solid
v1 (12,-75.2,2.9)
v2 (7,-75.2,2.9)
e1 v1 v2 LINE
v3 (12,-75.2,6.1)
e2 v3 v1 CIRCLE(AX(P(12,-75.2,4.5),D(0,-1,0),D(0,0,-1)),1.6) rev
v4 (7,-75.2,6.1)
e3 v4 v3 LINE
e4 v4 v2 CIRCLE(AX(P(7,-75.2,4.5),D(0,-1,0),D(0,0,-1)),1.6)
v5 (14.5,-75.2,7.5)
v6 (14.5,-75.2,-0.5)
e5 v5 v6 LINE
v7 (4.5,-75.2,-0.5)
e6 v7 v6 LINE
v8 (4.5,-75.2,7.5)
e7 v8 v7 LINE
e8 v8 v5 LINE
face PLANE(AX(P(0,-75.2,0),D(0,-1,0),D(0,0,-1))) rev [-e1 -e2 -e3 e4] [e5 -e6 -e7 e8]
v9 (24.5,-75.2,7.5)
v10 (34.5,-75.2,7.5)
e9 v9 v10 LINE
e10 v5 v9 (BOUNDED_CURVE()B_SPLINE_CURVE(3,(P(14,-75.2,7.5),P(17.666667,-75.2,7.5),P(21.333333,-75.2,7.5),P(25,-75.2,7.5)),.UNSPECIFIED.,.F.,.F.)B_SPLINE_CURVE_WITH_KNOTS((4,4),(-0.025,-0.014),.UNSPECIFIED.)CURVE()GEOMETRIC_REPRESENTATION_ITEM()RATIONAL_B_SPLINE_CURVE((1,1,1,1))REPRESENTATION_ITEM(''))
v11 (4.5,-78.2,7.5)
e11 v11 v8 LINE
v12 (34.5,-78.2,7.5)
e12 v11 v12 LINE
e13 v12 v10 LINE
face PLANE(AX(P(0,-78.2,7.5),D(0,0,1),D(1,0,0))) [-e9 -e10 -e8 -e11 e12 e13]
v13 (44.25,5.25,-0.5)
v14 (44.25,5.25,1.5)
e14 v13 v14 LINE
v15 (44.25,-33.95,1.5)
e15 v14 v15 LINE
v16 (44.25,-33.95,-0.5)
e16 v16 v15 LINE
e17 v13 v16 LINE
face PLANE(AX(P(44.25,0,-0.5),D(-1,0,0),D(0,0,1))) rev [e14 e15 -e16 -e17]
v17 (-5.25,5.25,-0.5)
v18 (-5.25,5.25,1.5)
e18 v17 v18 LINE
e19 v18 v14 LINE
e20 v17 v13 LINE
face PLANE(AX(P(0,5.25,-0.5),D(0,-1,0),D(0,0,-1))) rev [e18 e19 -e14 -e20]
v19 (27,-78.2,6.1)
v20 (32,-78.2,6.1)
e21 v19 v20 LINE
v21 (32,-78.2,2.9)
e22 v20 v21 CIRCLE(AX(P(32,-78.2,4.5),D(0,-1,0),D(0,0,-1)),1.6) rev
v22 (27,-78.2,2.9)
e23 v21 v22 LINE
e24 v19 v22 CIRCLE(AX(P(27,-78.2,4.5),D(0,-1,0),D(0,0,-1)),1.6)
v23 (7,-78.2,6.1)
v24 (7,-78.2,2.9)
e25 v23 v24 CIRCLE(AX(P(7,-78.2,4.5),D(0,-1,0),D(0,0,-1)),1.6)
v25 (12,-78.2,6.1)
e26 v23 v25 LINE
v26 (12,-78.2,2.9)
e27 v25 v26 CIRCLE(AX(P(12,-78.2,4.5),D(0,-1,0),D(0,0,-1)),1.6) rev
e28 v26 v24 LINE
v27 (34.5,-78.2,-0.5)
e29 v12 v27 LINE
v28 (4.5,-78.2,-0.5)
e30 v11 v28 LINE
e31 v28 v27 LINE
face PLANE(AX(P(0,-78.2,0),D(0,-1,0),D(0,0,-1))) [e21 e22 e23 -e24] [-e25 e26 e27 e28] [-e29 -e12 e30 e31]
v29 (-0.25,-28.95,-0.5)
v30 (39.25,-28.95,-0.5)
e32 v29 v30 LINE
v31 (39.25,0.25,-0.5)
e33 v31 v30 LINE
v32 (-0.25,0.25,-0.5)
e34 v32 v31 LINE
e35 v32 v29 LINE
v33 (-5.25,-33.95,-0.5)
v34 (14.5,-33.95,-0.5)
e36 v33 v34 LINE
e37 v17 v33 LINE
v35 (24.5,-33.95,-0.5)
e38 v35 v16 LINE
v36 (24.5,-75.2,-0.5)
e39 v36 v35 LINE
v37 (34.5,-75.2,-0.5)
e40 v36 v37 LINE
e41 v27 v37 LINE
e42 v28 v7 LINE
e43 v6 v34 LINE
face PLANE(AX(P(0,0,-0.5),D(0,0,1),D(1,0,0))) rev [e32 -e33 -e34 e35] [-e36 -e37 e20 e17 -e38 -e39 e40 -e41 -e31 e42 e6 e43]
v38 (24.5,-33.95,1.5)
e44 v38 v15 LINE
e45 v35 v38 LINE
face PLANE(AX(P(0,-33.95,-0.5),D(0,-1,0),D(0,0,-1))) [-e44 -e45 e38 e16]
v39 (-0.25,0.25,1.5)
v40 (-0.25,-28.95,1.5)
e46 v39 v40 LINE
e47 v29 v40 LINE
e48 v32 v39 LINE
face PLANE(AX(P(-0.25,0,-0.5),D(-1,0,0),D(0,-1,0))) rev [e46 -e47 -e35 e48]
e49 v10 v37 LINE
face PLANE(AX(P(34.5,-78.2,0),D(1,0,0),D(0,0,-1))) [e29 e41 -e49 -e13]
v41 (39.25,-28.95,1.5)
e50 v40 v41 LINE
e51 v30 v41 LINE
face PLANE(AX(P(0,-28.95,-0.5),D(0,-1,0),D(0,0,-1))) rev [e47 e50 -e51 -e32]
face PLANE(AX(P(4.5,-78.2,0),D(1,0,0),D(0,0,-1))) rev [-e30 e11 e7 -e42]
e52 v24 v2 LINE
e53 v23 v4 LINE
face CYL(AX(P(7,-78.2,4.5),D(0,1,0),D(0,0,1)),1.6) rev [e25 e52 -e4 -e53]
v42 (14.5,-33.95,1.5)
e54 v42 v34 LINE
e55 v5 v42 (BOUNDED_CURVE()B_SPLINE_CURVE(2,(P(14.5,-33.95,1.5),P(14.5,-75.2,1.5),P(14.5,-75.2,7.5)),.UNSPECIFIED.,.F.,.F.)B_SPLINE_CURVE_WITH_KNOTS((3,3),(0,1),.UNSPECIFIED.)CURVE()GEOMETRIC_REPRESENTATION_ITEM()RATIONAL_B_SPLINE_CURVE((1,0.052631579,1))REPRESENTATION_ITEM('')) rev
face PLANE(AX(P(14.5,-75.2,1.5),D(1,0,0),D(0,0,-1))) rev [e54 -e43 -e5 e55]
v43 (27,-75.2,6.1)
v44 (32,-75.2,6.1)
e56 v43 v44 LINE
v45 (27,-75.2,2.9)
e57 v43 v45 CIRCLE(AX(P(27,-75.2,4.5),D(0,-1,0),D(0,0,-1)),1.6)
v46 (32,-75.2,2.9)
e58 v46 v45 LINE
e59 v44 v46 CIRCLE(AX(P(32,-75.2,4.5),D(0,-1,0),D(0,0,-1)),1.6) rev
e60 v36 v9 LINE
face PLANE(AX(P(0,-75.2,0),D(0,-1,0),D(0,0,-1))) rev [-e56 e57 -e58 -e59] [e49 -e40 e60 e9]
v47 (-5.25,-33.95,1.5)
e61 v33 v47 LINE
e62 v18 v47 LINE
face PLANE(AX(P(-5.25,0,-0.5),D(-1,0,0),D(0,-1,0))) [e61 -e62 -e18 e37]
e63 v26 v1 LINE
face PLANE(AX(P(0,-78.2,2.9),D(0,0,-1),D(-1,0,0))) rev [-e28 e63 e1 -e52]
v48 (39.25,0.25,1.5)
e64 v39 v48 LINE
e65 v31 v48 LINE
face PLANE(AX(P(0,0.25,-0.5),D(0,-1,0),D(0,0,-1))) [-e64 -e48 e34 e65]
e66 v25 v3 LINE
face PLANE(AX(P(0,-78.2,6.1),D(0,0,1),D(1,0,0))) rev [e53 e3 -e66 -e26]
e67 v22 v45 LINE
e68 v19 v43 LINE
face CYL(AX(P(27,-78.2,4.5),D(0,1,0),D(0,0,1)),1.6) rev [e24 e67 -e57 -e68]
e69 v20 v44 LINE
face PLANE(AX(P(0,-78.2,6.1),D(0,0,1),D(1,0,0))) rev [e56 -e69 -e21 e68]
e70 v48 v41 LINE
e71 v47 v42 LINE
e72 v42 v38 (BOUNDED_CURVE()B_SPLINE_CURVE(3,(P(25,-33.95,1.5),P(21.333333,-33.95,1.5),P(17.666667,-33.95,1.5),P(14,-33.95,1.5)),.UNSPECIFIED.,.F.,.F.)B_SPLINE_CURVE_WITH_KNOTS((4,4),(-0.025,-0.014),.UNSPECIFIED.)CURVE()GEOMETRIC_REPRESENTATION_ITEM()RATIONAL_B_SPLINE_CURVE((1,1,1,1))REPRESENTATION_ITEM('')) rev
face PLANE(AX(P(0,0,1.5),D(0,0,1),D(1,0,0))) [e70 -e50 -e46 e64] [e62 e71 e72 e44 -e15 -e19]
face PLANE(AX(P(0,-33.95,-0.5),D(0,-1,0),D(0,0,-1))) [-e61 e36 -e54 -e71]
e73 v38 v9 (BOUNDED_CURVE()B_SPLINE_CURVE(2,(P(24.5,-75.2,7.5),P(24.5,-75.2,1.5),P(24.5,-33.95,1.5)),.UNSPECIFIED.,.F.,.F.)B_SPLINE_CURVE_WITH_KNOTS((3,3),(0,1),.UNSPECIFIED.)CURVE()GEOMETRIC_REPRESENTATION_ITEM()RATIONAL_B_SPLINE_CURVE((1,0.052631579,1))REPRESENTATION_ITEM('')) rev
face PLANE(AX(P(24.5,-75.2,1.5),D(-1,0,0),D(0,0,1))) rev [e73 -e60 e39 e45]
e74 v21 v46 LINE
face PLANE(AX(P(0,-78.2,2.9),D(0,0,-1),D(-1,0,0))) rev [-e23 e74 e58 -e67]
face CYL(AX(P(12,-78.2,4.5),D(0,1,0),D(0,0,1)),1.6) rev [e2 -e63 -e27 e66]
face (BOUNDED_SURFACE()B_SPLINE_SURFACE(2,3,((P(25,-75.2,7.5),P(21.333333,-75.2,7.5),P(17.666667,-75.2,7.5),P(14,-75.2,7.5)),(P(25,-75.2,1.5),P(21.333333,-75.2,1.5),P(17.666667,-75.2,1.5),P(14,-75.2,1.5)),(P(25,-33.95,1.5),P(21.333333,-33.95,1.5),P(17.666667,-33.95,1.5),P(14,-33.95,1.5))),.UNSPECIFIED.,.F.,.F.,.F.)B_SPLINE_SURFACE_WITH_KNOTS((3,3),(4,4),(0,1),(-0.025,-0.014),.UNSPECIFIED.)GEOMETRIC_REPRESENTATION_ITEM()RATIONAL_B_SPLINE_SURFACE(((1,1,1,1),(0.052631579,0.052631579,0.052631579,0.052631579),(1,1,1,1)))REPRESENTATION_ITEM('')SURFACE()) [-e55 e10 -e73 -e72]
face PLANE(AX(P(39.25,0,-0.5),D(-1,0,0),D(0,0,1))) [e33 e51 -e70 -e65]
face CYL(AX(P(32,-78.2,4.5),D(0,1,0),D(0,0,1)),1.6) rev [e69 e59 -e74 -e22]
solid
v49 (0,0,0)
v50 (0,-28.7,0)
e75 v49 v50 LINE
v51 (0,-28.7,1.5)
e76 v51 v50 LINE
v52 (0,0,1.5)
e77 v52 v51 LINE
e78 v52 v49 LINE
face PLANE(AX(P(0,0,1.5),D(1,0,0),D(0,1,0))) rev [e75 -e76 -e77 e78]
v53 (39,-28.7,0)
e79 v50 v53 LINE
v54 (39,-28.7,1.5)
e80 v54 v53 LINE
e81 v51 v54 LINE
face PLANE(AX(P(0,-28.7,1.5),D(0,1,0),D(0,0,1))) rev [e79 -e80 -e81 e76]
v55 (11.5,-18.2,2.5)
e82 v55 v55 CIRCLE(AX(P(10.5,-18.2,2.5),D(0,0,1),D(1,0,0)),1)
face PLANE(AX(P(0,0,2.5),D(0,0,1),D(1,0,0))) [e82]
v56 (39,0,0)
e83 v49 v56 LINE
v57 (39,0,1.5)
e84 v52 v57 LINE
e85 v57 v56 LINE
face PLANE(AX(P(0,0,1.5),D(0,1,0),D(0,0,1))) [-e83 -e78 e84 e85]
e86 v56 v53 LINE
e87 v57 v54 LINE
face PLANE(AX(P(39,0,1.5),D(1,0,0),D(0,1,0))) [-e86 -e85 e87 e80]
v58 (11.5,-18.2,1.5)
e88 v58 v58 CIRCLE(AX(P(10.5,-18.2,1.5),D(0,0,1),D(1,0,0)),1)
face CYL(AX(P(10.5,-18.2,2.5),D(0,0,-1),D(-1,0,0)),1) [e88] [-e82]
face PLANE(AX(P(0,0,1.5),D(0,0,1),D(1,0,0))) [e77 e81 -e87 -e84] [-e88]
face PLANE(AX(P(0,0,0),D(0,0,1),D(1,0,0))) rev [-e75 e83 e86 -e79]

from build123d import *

# Parameters (mm, degrees)
SKETCH1_W            = 39
SKETCH1_H            = 28.7
BOSS_EXTRUDE2_DEPTH  = 1.5
SKETCH3_R            = 1
BOSS_EXTRUDE3_DEPTH  = 1
SKETCH4_W            = 49.5
SKETCH4_H            = 39.2
SKETCH4_W_2          = 39.5
SKETCH4_H_2          = 29.2
BOSS_EXTRUDE4_DEPTH  = 2
SKETCH6_W            = 10
SKETCH6_H            = 2
BOSS_EXTRUDE5_DEPTH  = 41.25
SKETCH7_W            = 10
SKETCH7_H            = 3
SKETCH7_H_2          = 2
BOSS_EXTRUDE10_DEPTH = 3
FILLET5_START        = 14.5
FILLET5_DEPTH        = 10


with BuildPart() as part:
    # Sketch1 → Boss-Extrude2 (new body)
    with BuildSketch(Plane.XY):
        with Locations((19.5, -14.35)):
            Rectangle(SKETCH1_W, SKETCH1_H)
    extrude(amount=BOSS_EXTRUDE2_DEPTH)

    # Sketch3 → Boss-Extrude3 (add)
    with BuildSketch(Plane.XY.offset(1.5)):
        with Locations((10.5, -18.2)):
            Circle(SKETCH3_R)
    extrude(amount=BOSS_EXTRUDE3_DEPTH)


with BuildPart() as body_2:
    # Sketch4 → Boss-Extrude4 (new body)
    with BuildSketch(Plane.XY.offset(1.5)):
        with Locations((19.5, -14.35)):
            Rectangle(SKETCH4_W, SKETCH4_H)
        with Locations((19.5, -14.35)):
            Rectangle(SKETCH4_W_2, SKETCH4_H_2, mode=Mode.SUBTRACT)
    extrude(amount=-BOSS_EXTRUDE4_DEPTH)

    # Sketch6 → Boss-Extrude5 (add)
    with BuildSketch(Plane.XZ.offset(33.95)):
        with Locations((19.5, 0.5)):
            Rectangle(SKETCH6_W, SKETCH6_H)
    extrude(amount=BOSS_EXTRUDE5_DEPTH)

    # Sketch7 → Boss-Extrude10 (add)
    with BuildSketch(Plane.XZ.offset(75.2)):
        with BuildLine():
            Line((13.6, 4.5), (14.5, 4.5))
            Line((14.5, 4.5), (14.5, 7.5))
            Line((14.5, 7.5), (4.5, 7.5))
            Line((4.5, 7.5), (4.5, 4.5))
            Line((4.5, 4.5), (5.4, 4.5))
            ThreePointArc((5.4, 4.5), (5.86862915, 5.63137085), (7, 6.1))
            Line((7, 6.1), (12, 6.1))
            ThreePointArc((12, 6.1), (13.13137085, 5.63137085), (13.6, 4.5))
        make_face()
        with BuildLine():
            Line((4.5, 1.5), (14.5, 1.5))
            Line((14.5, 1.5), (14.5, 4.5))
            Line((14.5, 4.5), (13.6, 4.5))
            ThreePointArc((13.6, 4.5), (13.13137085, 3.36862915), (12, 2.9))
            Line((12, 2.9), (7, 2.9))
            ThreePointArc((7, 2.9), (5.86862915, 3.36862915), (5.4, 4.5))
            Line((5.4, 4.5), (4.5, 4.5))
            Line((4.5, 4.5), (4.5, 1.5))
        make_face()
        with Locations((19.5, 6)):
            Rectangle(SKETCH7_W, SKETCH7_H)
        with Locations((19.5, 3)):
            Rectangle(SKETCH7_W, SKETCH7_H)
        with BuildLine():
            Line((24.5, 4.5), (24.5, 1.5))
            Line((24.5, 1.5), (34.5, 1.5))
            Line((34.5, 1.5), (34.5, 4.5))
            Line((34.5, 4.5), (33.6, 4.5))
            ThreePointArc((33.6, 4.5), (33.13137085, 3.36862915), (32, 2.9))
            Line((32, 2.9), (27, 2.9))
            ThreePointArc((27, 2.9), (25.86862915, 3.36862915), (25.4, 4.5))
            Line((25.4, 4.5), (24.5, 4.5))
        make_face()
        with BuildLine():
            Line((24.5, 7.5), (24.5, 4.5))
            Line((24.5, 4.5), (25.4, 4.5))
            ThreePointArc((25.4, 4.5), (25.86862915, 5.63137085), (27, 6.1))
            Line((27, 6.1), (32, 6.1))
            ThreePointArc((32, 6.1), (33.13137085, 5.63137085), (33.6, 4.5))
            Line((33.6, 4.5), (34.5, 4.5))
            Line((34.5, 4.5), (34.5, 7.5))
            Line((34.5, 7.5), (24.5, 7.5))
        make_face()
        with Locations((29.5, 0.5)):
            Rectangle(SKETCH7_W, SKETCH7_H_2)
        with Locations((19.5, 0.5)):
            Rectangle(SKETCH7_W, SKETCH7_H_2)
        with Locations((9.5, 0.5)):
            Rectangle(SKETCH7_W, SKETCH7_H_2)
    extrude(amount=BOSS_EXTRUDE10_DEPTH)

    # Fillet5: read off the stored shape, not the designer's step
    # Fillet5 outline → Fillet5 (add)
    with BuildSketch(Plane.YZ.offset(FILLET5_START)):
        with BuildLine():
            add(Edge.make_bspline(
                [(-75.2, 7.5), (-75.2, 1.5), (-33.95, 1.5)],
                knots=[0, 0, 0, 1, 1, 1], degree=2, weights=[1, 0.052631579, 1]))
            Line((-75.2, 7.5), (-75.2, 1.5))
            Line((-75.2, 1.5), (-33.95, 1.5))
        make_face()
    extrude(amount=FILLET5_DEPTH)


solid = Compound([part.part, body_2.part])
